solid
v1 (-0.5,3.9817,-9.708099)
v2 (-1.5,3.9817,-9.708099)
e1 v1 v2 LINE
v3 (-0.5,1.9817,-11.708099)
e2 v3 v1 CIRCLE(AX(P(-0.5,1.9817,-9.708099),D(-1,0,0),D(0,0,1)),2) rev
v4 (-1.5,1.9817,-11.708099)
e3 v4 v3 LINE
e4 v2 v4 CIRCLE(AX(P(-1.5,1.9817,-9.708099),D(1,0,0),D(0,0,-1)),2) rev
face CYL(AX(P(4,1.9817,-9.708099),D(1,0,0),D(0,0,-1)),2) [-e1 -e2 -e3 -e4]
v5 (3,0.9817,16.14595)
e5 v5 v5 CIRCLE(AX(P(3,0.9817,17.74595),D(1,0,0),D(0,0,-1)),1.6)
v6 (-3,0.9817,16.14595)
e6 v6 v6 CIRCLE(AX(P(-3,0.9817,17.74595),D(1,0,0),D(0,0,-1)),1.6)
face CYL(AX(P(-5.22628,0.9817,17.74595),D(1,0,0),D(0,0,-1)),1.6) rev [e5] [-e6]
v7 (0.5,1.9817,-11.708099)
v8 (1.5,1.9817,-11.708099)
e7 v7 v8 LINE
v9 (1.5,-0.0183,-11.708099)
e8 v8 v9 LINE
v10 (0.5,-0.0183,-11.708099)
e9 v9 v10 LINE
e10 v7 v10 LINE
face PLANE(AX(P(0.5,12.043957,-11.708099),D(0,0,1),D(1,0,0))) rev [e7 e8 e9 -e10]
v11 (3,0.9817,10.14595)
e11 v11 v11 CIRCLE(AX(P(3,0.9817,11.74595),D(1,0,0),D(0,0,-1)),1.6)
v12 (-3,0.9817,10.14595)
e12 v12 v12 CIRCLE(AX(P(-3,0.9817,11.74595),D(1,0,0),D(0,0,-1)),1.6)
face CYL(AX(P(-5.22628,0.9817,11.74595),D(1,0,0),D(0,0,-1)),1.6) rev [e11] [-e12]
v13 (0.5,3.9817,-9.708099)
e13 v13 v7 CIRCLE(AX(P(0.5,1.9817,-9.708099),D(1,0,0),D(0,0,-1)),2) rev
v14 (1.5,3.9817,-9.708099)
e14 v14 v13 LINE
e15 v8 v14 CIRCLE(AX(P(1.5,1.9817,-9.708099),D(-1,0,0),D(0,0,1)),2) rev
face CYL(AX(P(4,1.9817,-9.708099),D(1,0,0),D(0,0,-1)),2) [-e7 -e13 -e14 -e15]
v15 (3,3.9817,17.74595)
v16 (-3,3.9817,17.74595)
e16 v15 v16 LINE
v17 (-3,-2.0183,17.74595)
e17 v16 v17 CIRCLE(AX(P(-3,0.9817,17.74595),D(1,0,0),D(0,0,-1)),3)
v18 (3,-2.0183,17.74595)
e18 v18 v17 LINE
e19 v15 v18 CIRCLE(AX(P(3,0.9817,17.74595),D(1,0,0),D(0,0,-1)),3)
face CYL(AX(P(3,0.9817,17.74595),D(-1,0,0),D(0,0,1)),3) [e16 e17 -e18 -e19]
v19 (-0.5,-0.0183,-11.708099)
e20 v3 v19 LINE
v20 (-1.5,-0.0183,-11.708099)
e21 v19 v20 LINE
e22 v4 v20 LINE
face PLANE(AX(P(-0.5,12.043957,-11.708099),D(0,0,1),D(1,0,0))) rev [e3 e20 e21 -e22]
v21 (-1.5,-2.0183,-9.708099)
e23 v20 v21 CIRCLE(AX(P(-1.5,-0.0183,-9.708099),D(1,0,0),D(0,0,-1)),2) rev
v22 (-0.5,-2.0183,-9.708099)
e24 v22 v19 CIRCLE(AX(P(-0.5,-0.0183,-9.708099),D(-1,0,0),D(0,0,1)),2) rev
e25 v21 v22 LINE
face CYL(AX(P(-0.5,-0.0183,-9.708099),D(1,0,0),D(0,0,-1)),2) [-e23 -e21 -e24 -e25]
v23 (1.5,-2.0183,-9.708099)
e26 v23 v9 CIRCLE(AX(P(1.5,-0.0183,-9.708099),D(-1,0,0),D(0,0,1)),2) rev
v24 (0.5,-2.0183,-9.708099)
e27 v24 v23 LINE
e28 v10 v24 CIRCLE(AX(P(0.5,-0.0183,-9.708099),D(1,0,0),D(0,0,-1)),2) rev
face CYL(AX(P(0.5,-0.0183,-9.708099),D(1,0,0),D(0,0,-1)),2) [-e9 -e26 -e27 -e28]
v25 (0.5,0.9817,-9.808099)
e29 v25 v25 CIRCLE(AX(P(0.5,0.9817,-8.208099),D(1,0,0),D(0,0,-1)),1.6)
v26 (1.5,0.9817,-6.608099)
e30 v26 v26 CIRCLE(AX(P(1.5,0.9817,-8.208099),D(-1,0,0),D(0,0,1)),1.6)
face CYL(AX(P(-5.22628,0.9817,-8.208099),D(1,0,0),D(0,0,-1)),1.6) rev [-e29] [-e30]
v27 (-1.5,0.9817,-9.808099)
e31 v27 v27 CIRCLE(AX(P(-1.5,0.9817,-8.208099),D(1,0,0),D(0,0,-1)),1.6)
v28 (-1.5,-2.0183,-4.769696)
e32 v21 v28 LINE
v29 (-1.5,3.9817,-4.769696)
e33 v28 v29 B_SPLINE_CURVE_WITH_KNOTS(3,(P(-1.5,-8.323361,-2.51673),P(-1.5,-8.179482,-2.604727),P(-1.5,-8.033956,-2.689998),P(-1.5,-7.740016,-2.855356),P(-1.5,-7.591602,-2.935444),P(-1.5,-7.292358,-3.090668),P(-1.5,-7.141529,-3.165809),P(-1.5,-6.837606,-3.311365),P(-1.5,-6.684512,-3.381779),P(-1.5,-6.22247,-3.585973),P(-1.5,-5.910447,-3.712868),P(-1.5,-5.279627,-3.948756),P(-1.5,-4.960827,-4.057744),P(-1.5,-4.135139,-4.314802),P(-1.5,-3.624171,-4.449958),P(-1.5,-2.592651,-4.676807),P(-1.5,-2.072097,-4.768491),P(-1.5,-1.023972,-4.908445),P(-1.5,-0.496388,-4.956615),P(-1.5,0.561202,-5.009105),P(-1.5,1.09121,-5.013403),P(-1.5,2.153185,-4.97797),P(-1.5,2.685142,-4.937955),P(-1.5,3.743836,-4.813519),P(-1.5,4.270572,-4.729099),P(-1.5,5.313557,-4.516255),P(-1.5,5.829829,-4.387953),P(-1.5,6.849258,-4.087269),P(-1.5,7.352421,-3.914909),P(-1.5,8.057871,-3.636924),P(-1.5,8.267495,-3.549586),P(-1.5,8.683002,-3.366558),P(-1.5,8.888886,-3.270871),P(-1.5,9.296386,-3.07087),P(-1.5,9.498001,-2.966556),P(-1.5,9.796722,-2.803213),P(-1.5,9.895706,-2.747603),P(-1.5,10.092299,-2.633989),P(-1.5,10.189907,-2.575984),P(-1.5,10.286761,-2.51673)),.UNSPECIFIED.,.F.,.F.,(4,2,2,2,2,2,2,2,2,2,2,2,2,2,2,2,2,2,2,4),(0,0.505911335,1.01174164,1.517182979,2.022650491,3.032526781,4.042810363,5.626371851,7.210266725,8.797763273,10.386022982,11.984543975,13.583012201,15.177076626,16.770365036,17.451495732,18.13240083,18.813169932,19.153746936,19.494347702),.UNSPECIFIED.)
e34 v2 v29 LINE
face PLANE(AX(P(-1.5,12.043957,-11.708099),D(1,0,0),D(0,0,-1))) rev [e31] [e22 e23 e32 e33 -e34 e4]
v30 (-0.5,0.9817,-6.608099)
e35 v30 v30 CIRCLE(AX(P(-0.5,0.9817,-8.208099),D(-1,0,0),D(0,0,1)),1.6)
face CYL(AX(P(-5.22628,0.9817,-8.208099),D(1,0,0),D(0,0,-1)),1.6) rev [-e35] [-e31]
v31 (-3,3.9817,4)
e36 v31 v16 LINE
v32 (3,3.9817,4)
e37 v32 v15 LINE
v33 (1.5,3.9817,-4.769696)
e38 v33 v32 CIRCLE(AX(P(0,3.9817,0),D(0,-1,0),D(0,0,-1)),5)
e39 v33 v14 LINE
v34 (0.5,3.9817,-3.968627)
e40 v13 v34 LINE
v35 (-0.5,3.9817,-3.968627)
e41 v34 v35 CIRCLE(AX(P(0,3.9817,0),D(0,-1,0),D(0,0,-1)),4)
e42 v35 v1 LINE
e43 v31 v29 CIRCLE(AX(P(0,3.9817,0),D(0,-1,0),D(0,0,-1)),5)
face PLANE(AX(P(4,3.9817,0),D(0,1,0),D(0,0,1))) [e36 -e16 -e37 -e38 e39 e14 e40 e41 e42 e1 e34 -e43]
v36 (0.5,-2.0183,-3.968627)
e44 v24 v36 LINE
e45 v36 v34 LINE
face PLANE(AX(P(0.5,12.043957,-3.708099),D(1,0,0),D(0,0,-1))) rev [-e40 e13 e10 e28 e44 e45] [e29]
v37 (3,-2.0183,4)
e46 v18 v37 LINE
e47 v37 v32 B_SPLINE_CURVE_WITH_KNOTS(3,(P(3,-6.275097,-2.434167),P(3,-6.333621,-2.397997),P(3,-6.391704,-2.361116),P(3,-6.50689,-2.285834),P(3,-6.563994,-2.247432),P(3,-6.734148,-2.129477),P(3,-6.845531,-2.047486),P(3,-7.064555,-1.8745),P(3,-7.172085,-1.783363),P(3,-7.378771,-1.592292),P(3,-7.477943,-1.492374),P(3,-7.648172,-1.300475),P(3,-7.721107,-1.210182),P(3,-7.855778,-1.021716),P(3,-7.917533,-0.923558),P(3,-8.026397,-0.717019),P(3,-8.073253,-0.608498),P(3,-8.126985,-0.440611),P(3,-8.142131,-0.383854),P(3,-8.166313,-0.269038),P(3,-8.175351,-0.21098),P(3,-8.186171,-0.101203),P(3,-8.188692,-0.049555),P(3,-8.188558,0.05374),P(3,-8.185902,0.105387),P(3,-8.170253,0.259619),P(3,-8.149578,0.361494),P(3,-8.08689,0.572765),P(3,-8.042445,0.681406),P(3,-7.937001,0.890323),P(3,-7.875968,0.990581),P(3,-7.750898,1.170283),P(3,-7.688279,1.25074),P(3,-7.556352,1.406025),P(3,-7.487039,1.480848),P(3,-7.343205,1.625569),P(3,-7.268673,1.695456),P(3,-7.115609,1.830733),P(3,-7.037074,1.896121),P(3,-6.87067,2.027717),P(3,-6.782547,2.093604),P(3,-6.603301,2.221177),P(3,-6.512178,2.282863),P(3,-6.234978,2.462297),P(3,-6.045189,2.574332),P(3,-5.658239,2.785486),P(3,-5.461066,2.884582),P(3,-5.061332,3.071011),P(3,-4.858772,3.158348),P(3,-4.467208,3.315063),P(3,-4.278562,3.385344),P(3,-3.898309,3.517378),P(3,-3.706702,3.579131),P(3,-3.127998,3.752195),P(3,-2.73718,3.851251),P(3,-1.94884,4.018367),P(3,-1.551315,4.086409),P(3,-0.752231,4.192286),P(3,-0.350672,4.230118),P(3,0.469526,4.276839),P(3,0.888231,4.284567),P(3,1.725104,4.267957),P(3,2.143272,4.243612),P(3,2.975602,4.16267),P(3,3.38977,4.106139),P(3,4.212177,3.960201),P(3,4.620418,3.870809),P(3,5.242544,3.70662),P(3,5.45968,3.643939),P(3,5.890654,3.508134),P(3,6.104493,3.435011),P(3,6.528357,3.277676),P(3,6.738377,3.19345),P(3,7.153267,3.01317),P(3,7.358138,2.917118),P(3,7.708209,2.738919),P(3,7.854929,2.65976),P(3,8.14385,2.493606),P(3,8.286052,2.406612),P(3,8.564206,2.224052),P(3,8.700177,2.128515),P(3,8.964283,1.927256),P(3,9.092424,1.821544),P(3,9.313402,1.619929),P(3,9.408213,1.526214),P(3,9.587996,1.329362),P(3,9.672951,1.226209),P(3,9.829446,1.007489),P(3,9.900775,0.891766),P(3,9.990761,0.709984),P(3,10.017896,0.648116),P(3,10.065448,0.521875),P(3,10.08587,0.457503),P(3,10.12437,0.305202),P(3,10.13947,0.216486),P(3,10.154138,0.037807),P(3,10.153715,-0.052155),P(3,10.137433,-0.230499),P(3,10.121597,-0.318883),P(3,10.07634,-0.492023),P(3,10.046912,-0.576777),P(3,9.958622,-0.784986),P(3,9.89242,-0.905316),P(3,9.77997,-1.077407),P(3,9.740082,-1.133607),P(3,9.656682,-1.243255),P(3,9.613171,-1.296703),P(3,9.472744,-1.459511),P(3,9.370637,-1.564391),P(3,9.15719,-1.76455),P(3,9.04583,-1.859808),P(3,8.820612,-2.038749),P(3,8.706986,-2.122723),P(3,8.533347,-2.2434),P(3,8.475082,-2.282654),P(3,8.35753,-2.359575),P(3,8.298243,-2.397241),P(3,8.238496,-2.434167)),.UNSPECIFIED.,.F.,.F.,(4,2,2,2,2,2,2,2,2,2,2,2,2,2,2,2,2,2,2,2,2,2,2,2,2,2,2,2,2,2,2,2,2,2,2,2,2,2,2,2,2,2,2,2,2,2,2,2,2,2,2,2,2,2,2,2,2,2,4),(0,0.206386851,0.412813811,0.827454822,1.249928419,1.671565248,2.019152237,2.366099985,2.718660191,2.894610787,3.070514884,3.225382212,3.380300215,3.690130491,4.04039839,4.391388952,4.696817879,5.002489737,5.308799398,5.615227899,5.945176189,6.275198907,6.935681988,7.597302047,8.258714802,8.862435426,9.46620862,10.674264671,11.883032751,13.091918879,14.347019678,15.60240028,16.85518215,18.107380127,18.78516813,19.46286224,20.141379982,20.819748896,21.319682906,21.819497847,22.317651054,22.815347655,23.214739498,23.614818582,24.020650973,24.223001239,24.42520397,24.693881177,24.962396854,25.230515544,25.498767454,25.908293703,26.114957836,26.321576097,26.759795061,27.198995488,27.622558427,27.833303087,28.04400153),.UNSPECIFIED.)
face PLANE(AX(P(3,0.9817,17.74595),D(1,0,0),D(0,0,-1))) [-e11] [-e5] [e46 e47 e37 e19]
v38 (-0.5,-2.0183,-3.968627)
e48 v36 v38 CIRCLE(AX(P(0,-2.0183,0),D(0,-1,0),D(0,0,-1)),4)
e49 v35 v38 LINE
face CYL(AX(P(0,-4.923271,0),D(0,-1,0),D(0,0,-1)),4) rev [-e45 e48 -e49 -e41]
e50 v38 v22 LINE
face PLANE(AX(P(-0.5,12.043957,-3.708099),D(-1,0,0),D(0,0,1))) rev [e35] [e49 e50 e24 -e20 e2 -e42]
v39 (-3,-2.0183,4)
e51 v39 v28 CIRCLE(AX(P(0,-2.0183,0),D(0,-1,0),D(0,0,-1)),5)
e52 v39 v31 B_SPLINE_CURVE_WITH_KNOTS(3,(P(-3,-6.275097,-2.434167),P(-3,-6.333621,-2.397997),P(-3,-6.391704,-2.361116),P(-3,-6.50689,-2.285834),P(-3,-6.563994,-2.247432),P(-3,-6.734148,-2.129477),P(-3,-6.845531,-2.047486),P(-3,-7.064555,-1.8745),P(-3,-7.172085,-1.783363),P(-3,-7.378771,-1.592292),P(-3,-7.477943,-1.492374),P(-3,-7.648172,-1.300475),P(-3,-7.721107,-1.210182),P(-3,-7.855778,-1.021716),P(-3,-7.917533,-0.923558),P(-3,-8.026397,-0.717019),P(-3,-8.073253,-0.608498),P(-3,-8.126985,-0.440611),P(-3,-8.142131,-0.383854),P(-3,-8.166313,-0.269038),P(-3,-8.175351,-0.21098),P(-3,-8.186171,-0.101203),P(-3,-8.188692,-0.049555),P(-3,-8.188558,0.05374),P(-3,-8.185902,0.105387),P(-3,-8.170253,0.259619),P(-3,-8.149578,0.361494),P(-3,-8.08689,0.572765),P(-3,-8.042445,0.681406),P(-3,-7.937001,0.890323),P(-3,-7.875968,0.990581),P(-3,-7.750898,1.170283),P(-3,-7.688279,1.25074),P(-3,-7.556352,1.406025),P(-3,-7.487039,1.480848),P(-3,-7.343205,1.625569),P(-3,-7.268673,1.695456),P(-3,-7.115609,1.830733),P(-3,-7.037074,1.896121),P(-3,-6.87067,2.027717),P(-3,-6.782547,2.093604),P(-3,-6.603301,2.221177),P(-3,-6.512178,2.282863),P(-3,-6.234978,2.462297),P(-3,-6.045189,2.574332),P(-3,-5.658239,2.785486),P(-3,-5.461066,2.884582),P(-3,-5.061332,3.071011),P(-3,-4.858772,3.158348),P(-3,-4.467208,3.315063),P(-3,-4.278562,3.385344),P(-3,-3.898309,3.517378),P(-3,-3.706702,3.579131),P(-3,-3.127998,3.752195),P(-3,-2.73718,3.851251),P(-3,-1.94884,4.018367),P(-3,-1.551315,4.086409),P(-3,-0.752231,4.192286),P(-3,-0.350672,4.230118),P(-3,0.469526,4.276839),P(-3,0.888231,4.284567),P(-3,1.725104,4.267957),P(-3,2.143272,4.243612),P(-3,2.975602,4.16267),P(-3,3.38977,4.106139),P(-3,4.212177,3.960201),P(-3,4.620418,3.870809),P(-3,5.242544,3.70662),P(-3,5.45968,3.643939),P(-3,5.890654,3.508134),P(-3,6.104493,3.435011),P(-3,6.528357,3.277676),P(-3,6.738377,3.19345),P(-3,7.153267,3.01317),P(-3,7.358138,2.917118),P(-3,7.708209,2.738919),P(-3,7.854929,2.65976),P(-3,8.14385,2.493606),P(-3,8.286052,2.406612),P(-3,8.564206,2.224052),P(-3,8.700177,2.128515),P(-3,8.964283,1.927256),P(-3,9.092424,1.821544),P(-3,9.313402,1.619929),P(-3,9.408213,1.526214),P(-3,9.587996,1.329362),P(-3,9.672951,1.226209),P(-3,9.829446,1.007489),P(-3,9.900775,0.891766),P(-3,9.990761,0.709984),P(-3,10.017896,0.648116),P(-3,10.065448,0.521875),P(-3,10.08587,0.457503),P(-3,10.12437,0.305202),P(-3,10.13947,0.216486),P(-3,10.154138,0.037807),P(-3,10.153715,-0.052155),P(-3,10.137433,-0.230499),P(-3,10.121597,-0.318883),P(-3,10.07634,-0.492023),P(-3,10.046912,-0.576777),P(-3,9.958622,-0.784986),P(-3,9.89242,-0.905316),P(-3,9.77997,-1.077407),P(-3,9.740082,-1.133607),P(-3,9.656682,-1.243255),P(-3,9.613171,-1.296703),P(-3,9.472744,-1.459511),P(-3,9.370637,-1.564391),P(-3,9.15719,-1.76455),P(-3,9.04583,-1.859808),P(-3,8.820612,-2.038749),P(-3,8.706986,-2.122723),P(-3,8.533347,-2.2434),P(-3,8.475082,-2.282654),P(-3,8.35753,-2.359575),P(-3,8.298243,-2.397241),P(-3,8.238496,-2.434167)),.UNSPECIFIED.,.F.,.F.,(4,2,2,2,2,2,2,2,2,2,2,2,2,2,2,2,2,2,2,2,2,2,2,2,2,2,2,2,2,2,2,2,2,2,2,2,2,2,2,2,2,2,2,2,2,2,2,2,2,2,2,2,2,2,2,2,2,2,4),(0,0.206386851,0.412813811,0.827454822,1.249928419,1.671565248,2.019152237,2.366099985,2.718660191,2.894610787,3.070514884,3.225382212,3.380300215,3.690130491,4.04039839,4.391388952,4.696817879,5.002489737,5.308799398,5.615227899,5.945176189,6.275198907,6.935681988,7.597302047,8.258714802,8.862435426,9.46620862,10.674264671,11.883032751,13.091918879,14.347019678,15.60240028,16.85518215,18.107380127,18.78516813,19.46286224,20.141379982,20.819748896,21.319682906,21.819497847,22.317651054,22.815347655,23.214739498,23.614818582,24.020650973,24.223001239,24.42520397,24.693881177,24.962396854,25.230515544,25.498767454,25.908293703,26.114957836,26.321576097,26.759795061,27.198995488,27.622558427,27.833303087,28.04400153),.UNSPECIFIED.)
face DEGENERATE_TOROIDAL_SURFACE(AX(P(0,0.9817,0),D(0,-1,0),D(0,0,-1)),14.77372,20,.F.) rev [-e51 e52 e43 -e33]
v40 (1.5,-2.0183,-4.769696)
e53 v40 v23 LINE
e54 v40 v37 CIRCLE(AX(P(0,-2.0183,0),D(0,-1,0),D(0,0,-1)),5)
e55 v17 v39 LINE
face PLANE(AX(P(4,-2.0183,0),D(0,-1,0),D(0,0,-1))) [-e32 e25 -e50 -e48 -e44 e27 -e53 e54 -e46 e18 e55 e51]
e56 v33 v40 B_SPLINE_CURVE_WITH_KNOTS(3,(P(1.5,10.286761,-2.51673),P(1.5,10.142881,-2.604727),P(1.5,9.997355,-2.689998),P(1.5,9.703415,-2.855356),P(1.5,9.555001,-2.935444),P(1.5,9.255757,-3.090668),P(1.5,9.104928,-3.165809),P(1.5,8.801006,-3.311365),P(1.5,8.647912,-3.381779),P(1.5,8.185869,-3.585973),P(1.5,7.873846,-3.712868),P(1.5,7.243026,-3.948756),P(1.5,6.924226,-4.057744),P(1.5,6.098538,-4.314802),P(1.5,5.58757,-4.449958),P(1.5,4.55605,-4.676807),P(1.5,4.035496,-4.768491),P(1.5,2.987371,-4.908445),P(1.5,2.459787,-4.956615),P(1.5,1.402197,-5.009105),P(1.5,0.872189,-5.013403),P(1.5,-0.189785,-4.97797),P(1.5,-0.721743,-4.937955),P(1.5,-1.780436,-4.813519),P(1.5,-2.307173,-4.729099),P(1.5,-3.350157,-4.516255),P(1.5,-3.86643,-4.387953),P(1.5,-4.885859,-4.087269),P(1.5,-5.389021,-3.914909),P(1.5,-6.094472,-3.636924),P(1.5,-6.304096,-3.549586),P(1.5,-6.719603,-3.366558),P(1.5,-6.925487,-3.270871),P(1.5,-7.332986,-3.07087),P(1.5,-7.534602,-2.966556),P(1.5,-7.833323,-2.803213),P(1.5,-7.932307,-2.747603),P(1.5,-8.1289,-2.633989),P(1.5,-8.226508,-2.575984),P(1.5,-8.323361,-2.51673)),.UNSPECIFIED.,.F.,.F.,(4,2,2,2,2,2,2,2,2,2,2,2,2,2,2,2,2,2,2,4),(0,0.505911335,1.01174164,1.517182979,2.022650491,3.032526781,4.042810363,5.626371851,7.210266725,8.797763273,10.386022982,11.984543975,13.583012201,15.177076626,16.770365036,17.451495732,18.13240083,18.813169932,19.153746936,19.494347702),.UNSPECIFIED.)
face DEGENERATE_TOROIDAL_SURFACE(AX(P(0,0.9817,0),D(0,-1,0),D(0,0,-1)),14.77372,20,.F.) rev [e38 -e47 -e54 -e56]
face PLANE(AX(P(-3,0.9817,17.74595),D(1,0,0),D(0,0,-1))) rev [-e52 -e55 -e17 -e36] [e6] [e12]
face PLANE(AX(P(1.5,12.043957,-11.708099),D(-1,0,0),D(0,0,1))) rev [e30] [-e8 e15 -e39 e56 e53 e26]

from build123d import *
from OCP.BRepAlgoAPI import BRepAlgoAPI_Cut
from OCP.TopTools import TopTools_ListOfShape

# Parameters (mm, degrees)
CUT_EXTRUDE_1_DEPTH      = 9.395352378
CUT_EXTRUDE_1_DEPTH_BACK = 9.395352378
SKETCH_2_W               = 3
SKETCH_2_H               = 3.541131468
EXTRUDE_START            = -2.0183
EXTRUDE_1_DEPTH          = 6
EXTRUDE_2_DEPTH          = 3
EXTRUDE_2_DEPTH_BACK     = 3
SKETCH_6_R               = 1.6
CUT_EXTRUDE_2_DEPTH      = 23.66980552
SKETCH_7_R               = 4
CUT_EXTRUDE_3_DEPTH      = 23.219551454
FILLET_1_R               = 2


with BuildPart() as part:
    # 草图1 → 旋转1 (revolve)
    with BuildSketch(Plane.XY, mode=Mode.PRIVATE) as revolve_1_sk:
        with BuildLine():
            Line((4, 3.981699636), (4, -2.018300364))
            Line((4, -2.018300364), (5, -2.018300364))
            ThreePointArc((5, -2.018300364), (5.226280067, 0.981699636), (5, 3.981699636))
            Line((5, 3.981699636), (4, 3.981699636))
        make_face()
    revolve(revolve_1_sk.sketch.rotate(Axis((0, -4.923271421, 0), (0, 1, 0)), 90), axis=Axis((0, -4.923271421, 0), (0, 1, 0)))

    # 草图2 → 切除-拉伸1 (cut, two sides: drawn at the far end of the back side and taken through both)
    with BuildSketch(Plane(origin=(0, 0, 0), x_dir=(1, 0, 0), z_dir=(0, 1, 0)).offset(-CUT_EXTRUDE_1_DEPTH_BACK)):
        with Locations((0, 5.060025588)):
            Rectangle(SKETCH_2_W, SKETCH_2_H)
    extrude(amount=CUT_EXTRUDE_1_DEPTH + CUT_EXTRUDE_1_DEPTH_BACK, mode=Mode.SUBTRACT)

    # 草图3 → 凸台-拉伸1 (add)
    with BuildSketch(Plane(origin=(0, 0, 0), x_dir=(1, 0, 0), z_dir=(0, 1, 0)).offset(EXTRUDE_START)):
        Polygon((-1.5, 3.708099244), (-0.5, 3.708099244), (-0.5, 11.708099244), (-1.5, 11.708099244), (-1.5, 4.981969012), align=None)
        Polygon((1.5, 11.708099244), (1.5, 4.981969012), (1.5, 3.708099244), (0.5, 3.708099244), (0.5, 11.708099244), align=None)
    extrude(amount=EXTRUDE_1_DEPTH)

    # 草图5 → 凸台-拉伸2 (add, two sides: drawn at the far end of the back side and taken through both)
    with BuildSketch(Plane(origin=(0, 0, 0), x_dir=(0, 0, -1), z_dir=(1, 0, 0)).offset(-EXTRUDE_2_DEPTH_BACK)):
        with BuildLine():
            Line((-3.745950378, 3.981699636), (-17.745950378, 3.981699636))
            ThreePointArc((-17.745950378, 3.981699636), (-20.745950378, 0.981699636), (-17.745950378, -2.018300364))
            Line((-17.745950378, -2.018300364), (-3.745950378, -2.018300364))
            Line((-3.745950378, -2.018300364), (-3.745950378, 3.981699636))
        make_face()
    extrude(amount=EXTRUDE_2_DEPTH + EXTRUDE_2_DEPTH_BACK)

    # 草图6 → 切除-拉伸2 (cut, through all)
    with BuildSketch(Plane(origin=(3, 0, 0), x_dir=(0, 0, -1), z_dir=(1, 0, 0))):
        with Locations((-17.745950378, 0.981699636)):
            Circle(SKETCH_6_R)
        with Locations((8.208099244, 0.981699636)):
            Circle(SKETCH_6_R)
        with Locations((-11.745950378, 0.981699636)):
            Circle(SKETCH_6_R)
    extrude(amount=-CUT_EXTRUDE_2_DEPTH, mode=Mode.SUBTRACT)


with BuildPart() as cut_extrude_3_tool:
    # 草图7 → 切除-拉伸3 (new, through all)
    with BuildSketch(Plane(origin=(0, 3.981699636, 0), x_dir=(1, 0, 0), z_dir=(0, 1, 0))):
        Circle(SKETCH_7_R)
    extrude(amount=-CUT_EXTRUDE_3_DEPTH)


with BuildPart() as part_1:
    add(part.part)

    # 切除-拉伸3: cut by cut_extrude_3_tool, with a tolerance
    cut_extrude_3_stock = TopTools_ListOfShape()
    cut_extrude_3_stock.Append(part_1.part.wrapped)
    cut_extrude_3_tools = TopTools_ListOfShape()
    cut_extrude_3_tools.Append(cut_extrude_3_tool.part.wrapped)
    cut_extrude_3_cut = BRepAlgoAPI_Cut()
    cut_extrude_3_cut.SetArguments(cut_extrude_3_stock)
    cut_extrude_3_cut.SetTools(cut_extrude_3_tools)
    cut_extrude_3_cut.SetFuzzyValue(0.00001)
    cut_extrude_3_cut.Build()
    add(Compound.cast(cut_extrude_3_cut.Shape()).solids(), mode=Mode.REPLACE)

    # 圆角1
    fillet_1_edges = [part_1.edges().sort_by_distance(p)[0] for p in [
        (-1, -2.0183, -11.708099244),
        (-1, 3.9817, -11.708099244),
        (1, -2.0183, -11.708099244),
        (1, 3.9817, -11.708099244),
    ]]
    fillet(fillet_1_edges, radius=FILLET_1_R)


solid = part_1.part
